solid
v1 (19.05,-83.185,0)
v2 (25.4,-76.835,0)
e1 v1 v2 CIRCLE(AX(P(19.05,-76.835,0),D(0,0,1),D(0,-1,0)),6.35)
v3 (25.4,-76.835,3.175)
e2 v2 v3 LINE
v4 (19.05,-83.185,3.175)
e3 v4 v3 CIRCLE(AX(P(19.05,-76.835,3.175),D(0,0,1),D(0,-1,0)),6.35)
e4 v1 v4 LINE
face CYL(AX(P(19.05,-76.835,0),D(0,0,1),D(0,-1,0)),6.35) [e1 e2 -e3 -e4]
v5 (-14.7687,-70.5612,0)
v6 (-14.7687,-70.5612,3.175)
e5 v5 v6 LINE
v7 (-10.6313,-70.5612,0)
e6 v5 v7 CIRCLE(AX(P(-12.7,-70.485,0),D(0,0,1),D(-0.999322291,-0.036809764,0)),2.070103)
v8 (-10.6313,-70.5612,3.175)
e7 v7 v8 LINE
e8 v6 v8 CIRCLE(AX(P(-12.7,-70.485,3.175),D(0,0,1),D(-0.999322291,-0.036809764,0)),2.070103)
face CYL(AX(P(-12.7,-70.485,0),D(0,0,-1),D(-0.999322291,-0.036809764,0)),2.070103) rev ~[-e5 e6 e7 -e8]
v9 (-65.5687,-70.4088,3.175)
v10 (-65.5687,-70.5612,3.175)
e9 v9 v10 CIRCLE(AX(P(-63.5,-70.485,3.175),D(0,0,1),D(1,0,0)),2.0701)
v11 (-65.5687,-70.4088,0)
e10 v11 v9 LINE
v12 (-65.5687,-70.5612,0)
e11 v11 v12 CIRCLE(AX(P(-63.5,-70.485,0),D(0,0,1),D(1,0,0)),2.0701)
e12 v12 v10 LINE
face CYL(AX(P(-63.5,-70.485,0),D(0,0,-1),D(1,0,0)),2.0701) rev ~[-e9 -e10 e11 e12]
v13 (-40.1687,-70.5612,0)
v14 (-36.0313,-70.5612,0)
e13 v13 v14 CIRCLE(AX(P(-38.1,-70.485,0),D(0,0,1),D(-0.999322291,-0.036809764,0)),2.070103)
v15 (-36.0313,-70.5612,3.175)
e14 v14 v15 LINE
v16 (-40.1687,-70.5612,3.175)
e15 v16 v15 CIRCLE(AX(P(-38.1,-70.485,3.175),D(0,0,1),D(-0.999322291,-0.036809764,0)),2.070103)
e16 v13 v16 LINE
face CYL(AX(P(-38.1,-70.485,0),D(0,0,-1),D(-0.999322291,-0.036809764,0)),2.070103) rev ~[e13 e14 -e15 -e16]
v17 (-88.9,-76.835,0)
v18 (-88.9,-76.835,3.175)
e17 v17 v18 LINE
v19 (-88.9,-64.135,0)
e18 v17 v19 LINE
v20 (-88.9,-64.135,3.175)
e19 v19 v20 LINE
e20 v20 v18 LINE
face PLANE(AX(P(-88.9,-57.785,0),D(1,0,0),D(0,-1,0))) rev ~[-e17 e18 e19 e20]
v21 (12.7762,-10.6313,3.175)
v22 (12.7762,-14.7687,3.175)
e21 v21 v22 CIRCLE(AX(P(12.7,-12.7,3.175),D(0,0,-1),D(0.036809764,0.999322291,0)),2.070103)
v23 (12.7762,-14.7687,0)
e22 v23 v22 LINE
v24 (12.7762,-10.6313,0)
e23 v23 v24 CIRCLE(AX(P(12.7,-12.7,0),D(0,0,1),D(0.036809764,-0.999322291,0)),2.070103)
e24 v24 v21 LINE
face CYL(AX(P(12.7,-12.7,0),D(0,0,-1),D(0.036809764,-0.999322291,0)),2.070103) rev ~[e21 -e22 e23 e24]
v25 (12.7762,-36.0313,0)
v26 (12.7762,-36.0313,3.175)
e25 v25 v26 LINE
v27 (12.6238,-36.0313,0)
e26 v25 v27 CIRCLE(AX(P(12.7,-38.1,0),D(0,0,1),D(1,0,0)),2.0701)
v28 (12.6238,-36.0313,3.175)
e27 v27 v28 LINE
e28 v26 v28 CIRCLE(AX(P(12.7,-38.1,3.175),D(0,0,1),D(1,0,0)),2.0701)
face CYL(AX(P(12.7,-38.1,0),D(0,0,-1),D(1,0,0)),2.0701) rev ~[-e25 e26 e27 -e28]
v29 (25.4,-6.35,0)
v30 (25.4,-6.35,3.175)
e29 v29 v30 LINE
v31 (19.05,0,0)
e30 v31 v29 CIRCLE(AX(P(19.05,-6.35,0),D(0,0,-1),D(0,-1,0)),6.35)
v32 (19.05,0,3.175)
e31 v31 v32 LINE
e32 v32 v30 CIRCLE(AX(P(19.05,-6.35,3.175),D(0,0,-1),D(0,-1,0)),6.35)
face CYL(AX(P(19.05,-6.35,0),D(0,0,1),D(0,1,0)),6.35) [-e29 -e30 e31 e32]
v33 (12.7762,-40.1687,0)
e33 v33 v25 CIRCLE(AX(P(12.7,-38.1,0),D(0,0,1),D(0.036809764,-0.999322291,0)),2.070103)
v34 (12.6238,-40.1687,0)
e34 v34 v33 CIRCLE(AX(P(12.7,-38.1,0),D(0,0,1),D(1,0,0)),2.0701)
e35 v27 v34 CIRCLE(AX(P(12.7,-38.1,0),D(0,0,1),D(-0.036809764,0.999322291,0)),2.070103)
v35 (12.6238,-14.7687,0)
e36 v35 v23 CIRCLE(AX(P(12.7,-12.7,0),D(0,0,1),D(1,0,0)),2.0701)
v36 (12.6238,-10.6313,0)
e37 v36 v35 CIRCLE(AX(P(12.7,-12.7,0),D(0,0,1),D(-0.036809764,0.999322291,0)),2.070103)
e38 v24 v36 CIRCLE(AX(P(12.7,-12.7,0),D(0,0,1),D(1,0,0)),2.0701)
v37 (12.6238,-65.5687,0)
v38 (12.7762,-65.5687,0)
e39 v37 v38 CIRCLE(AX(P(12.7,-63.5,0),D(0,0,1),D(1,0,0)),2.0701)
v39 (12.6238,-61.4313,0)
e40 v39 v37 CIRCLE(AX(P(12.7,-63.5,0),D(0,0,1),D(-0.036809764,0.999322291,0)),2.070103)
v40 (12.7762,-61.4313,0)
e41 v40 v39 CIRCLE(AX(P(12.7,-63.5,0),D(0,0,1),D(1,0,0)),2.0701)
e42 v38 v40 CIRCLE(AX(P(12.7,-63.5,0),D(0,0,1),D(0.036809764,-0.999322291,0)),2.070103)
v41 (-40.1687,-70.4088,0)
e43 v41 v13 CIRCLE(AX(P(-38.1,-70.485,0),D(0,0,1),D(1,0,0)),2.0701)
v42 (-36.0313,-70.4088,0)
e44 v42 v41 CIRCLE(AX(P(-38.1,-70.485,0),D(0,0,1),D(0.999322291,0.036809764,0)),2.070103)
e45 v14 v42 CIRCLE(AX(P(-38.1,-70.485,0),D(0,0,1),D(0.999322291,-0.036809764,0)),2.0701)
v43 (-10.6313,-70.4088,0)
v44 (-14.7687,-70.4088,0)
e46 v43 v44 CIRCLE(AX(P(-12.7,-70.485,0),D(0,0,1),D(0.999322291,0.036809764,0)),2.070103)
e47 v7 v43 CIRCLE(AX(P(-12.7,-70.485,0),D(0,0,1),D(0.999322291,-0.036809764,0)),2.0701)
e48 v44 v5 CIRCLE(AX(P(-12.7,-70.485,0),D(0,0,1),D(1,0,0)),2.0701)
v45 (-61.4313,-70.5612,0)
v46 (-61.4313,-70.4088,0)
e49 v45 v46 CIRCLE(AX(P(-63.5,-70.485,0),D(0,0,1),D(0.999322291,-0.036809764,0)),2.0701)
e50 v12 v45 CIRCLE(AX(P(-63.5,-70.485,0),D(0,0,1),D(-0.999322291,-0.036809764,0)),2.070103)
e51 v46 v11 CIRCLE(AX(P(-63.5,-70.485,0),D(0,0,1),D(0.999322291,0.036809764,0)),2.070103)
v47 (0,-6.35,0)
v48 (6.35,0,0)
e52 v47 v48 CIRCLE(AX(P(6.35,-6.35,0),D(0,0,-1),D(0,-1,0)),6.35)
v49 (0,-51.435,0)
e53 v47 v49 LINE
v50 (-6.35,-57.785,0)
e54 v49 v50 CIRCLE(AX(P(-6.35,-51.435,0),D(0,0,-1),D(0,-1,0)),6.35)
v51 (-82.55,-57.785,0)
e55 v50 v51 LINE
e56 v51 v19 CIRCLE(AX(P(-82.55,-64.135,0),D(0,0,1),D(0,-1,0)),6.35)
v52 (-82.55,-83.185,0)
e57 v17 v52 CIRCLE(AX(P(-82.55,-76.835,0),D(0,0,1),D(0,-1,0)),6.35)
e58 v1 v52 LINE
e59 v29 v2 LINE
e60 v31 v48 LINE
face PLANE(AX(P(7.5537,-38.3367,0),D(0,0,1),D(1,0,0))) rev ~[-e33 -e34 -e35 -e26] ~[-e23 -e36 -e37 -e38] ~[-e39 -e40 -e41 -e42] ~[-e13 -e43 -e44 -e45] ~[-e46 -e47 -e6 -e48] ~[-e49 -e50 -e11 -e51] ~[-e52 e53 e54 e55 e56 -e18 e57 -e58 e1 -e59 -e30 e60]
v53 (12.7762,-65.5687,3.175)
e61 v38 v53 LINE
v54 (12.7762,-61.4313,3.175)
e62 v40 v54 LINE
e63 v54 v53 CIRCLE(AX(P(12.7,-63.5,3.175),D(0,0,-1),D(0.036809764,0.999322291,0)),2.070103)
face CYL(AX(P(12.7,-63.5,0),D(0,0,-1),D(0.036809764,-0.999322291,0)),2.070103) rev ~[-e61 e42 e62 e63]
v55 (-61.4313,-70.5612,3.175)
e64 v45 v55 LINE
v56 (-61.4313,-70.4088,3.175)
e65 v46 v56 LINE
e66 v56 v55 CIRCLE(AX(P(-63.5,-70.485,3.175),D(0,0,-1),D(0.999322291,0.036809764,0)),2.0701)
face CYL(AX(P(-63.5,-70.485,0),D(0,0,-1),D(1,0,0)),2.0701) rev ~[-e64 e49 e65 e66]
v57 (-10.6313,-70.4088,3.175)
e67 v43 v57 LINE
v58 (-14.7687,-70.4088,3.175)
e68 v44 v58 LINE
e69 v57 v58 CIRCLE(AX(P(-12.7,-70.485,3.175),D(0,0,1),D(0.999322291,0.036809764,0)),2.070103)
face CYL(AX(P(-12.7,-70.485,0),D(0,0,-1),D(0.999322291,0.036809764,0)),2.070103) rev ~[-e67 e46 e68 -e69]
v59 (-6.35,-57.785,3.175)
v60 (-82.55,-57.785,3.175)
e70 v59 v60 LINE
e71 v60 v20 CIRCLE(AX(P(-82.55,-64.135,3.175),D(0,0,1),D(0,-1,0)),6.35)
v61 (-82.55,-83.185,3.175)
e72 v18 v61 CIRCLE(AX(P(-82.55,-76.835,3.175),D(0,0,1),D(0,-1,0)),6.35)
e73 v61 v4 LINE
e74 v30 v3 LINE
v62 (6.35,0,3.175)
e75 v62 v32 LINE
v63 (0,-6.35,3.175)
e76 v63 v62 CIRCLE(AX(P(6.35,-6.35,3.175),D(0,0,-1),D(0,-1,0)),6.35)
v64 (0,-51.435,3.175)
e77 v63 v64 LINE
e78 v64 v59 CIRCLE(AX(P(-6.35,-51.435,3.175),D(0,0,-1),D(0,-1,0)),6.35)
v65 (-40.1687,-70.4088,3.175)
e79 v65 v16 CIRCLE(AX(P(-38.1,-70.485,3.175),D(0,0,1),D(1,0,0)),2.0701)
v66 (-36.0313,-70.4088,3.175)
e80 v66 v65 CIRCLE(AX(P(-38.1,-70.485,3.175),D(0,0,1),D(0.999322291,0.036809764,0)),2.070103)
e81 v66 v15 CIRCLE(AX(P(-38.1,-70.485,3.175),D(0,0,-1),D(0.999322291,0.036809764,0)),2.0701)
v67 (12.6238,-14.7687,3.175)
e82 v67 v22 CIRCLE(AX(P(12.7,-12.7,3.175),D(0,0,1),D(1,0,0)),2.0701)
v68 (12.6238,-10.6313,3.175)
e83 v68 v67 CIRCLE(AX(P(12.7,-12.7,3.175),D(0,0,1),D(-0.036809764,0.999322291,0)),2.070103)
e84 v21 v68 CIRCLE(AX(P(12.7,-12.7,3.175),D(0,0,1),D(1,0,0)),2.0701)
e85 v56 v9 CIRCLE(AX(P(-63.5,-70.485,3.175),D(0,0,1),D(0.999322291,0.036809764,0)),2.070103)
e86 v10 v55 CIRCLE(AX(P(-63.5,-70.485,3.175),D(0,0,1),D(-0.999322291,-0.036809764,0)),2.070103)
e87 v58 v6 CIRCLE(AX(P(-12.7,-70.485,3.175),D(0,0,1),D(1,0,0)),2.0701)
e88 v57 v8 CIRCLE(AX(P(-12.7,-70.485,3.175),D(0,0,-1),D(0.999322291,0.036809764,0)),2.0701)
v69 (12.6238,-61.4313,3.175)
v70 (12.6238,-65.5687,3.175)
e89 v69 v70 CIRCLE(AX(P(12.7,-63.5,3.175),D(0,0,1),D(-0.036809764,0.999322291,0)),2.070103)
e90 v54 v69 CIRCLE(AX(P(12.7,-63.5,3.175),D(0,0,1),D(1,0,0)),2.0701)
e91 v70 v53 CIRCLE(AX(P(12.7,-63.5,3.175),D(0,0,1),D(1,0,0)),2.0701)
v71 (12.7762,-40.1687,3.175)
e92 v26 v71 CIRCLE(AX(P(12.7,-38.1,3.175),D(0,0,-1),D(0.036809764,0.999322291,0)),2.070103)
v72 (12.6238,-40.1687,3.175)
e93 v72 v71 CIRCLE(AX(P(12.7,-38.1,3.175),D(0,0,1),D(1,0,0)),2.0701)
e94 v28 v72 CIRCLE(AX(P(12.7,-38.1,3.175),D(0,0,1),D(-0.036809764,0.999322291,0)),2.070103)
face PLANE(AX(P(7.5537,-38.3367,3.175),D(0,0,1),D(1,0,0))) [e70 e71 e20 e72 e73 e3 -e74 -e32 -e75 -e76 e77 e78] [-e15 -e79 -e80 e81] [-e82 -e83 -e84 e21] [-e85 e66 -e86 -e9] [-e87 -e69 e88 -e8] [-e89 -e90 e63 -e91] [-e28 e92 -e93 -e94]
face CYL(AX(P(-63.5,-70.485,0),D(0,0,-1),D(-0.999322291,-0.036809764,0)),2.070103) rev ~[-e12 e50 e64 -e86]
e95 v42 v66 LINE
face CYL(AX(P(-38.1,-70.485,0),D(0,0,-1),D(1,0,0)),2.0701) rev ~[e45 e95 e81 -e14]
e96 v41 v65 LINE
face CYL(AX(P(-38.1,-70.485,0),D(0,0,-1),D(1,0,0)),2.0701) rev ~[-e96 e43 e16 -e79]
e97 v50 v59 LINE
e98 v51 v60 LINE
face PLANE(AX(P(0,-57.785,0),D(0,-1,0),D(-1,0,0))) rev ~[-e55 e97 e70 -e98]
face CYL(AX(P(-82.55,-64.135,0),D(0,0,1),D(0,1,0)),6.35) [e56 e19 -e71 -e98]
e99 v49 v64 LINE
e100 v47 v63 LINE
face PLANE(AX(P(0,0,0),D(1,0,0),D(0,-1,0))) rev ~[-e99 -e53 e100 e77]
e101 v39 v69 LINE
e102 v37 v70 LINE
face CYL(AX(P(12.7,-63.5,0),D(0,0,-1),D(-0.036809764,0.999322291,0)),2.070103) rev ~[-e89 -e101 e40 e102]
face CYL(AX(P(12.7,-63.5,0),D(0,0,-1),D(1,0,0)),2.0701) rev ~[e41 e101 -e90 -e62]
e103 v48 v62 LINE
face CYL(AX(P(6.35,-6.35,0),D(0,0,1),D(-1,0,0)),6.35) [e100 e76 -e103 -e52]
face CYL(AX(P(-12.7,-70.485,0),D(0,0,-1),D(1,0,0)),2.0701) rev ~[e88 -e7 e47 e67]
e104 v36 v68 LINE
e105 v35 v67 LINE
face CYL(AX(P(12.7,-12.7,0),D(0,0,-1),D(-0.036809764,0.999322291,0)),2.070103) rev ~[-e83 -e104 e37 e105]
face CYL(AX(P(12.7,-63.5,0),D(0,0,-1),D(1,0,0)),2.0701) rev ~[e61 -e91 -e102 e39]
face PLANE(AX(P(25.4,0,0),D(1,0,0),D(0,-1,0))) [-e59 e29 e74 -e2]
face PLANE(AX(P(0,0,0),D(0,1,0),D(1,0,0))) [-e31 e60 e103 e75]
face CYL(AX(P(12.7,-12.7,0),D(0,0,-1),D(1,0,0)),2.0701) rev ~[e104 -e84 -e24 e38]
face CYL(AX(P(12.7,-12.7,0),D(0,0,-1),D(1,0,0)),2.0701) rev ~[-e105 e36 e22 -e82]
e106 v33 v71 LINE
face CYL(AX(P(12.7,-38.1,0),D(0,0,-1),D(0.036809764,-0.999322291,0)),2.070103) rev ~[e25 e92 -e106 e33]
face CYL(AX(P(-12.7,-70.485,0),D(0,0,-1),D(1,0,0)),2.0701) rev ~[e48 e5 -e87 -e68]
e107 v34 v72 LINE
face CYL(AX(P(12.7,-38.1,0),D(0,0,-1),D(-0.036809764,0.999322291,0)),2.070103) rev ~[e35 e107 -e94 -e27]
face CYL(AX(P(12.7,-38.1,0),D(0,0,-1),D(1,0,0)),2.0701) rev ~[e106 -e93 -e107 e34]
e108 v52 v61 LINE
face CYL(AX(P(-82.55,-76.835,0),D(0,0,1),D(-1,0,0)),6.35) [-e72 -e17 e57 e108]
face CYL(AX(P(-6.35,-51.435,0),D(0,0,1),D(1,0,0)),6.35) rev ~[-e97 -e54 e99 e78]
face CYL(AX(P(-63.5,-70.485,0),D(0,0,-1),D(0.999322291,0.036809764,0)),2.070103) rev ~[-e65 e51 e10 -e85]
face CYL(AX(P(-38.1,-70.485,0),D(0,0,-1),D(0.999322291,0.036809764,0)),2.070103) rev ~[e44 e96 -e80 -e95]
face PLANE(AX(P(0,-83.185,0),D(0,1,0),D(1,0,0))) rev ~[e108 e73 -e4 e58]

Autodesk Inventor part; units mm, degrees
ref_plane "YZ Plane" through (0, 0, 0) normal (1, 0, 0) x (0, 1, 0)
ref_plane "XZ Plane" through (0, 0, 0) normal (0, 1, 0) x (-1, 0, 0)
ref_plane "XY Plane" through (0, 0, 0) normal (0, 0, 1) x (1, 0, 0)
ref_plane "Work Plane1" through (7.5537, -38.3367, 0) normal (0, 0, 1) x (1, 0, 0)
sketch "Sketch1" plane through (7.5537, -38.3367, 0) normal (0, 0, 1) x (1, 0, 0)
  line L0 (-7.5537, -44.8483) -> (5.0701, -44.8483)
  line L1 (5.0701, -44.8483) -> (5.0701, -27.232)
  arc A0 (5.0701, -23.0946) -> (5.0701, -27.232) centre (5.1463, -25.1633) ccw
  line L2 (5.0701, -23.0946) -> (5.0701, -1.832)
  arc A1 (5.0701, 2.3054) -> (5.0701, -1.832) centre (5.1463, 0.2367) ccw
  line L3 (5.0701, 2.3054) -> (5.0701, 23.568)
  arc A2 (5.0701, 27.7054) -> (5.0701, 23.568) centre (5.1463, 25.6367) ccw
  line L4 (5.0701, 27.7054) -> (5.0701, 38.3367)
  line L5 (-7.5537, 38.3367) -> (5.0701, 38.3367)
  line L6 (-7.5537, 38.3367) -> (-7.5537, -44.8483)
  line L7 (5.2225, -44.8483) -> (17.8463, -44.8483)
  line L8 (17.8463, 38.3367) -> (17.8463, -44.8483)
  line L9 (5.2225, 38.3367) -> (17.8463, 38.3367)
  line L10 (5.2225, 27.7054) -> (5.2225, 38.3367)
  arc A3 (5.2225, 23.568) -> (5.2225, 27.7054) centre (5.1463, 25.6367) ccw
  line L11 (5.2225, 2.3054) -> (5.2225, 23.568)
  arc A4 (5.2225, -1.832) -> (5.2225, 2.3054) centre (5.1463, 0.2367) ccw
  line L12 (5.2225, -23.0946) -> (5.2225, -1.832)
  arc A5 (5.2225, -27.232) -> (5.2225, -23.0946) centre (5.1463, -25.1633) ccw
  line L13 (5.2225, -44.8483) -> (5.2225, -27.232)
  line L14 (-96.4537, -34.2184) -> (-96.4537, -44.8483)
  line L15 (-7.5537, -44.8483) -> (-96.4537, -44.8483)
  line L16 (-7.5537, -32.2245) -> (-7.5537, -44.8483)
  line L17 (-18.185, -32.2245) -> (-7.5537, -32.2245)
  arc A6 (-22.3224, -32.2245) -> (-18.185, -32.2245) centre (-20.2537, -32.1483) ccw
  line L18 (-43.585, -32.2245) -> (-22.3224, -32.2245)
  arc A7 (-47.7224, -32.2245) -> (-43.585, -32.2245) centre (-45.6537, -32.1483) ccw
  line L19 (-68.985, -32.2245) -> (-47.7224, -32.2245)
  arc A8 (-73.1224, -32.2245) -> (-68.985, -32.2245) centre (-71.0537, -32.1483) ccw
  line L20 (-94.385, -32.2245) -> (-73.1224, -32.2245)
  arc A9 (-96.4537, -34.2184) -> (-94.385, -32.2245) centre (-96.4537, -32.1483) ccw
  line L21 (-96.4537, -19.4483) -> (-96.4537, -30.0782)
  arc A10 (-94.385, -32.0721) -> (-96.4537, -30.0782) centre (-96.4537, -32.1483) ccw
  line L22 (-94.385, -32.0721) -> (-73.1224, -32.0721)
  arc A11 (-68.985, -32.0721) -> (-73.1224, -32.0721) centre (-71.0537, -32.1483) ccw
  line L23 (-68.985, -32.0721) -> (-47.7224, -32.0721)
  arc A12 (-43.585, -32.0721) -> (-47.7224, -32.0721) centre (-45.6537, -32.1483) ccw
  line L24 (-43.585, -32.0721) -> (-22.3224, -32.0721)
  arc A13 (-18.185, -32.0721) -> (-22.3224, -32.0721) centre (-20.2537, -32.1483) ccw
  line L25 (-18.185, -32.0721) -> (-7.5537, -32.0721)
  line L26 (-7.5537, -19.4483) -> (-7.5537, -32.0721)
  line L27 (-7.5537, -19.4483) -> (-96.4537, -19.4483)
  line L28 (-7.5537, 38.3367) -> (17.8463, 38.3367)
  line L29 (17.8463, 38.3367) -> (17.8463, -44.8483)
  line L30 (17.8463, -44.8483) -> (-7.5537, -44.8483)
  line L31 (-7.5537, -44.8483) -> (-7.5537, 38.3367)
  line L32 (-96.4537, -19.4483) -> (-7.5537, -19.4483)
  line L33 (-7.5537, -19.4483) -> (-7.5537, -44.8483)
  line L34 (-7.5537, -44.8483) -> (-96.4537, -44.8483)
  line L35 (-96.4537, -44.8483) -> (-96.4537, -19.4483)
  circle A14 centre (5.1463, -25.1633) radius 2.0701
  circle A15 centre (5.1463, 0.2367) radius 2.0701
  circle A16 centre (-45.6537, -32.1483) radius 2.0701
  circle A17 centre (-20.2537, -32.1483) radius 2.0701
  circle A18 centre (-71.0537, -32.1483) radius 2.0701
  circle A19 centre (5.1463, 25.6367) radius 2.0701
extrude "Plate1" add sketch "Sketch1" along normal blind 3.175 contours L6 L5 L4 A2 L3 A1 L2 A0 L1 L0 | L15 L14 A9 L20 A8 L19 A7 L18 A6 L17 L6 | L1 A14 L13 L30 | L17 A17 L25 L6 | L13 A5 L12 A4 L11 A3 L10 L9 L8 L7 | L25 A13 L24 A12 L23 A11 L22 A10 L21 L27 L6 | L35 A10 L22 A18 L20 A9 | L2 A15 L12 A14 | L18 A16 L24 A17 | L3 A19 L11 A15 | L10 A19 L4 L28 | L19 A18 L23 A16
fillet "Corner Round1" radius 6.35 6 edges at (0, 0, 1.5875) (25.4, 0, 1.5875) (-88.9, -57.785, 1.5875) (-88.9, -83.185, 1.5875) (0, -57.785, 1.5875) (25.4, -83.185, 1.5875)
equation "\"BendRadius\" = Thickness"
equation "\"BendReliefWidth\" = Thickness"
equation "\"BendReliefDepth\" = 0.5 * Thickness"
equation "\"CornerReliefSize\" = 4 * Thickness"
equation "\"MinimumRemnant\" = 2 * Thickness"
equation "\"TransitionRadius\" = BendRadius"
equation "\"JacobiRadiusSize\" = BendRadius"
equation "\"GapSize\" = Thickness"
equation "\"d0\" = BendRadius"
equation "\"Thickness\" = 3.175"
properties part number "Bumper Holder"
